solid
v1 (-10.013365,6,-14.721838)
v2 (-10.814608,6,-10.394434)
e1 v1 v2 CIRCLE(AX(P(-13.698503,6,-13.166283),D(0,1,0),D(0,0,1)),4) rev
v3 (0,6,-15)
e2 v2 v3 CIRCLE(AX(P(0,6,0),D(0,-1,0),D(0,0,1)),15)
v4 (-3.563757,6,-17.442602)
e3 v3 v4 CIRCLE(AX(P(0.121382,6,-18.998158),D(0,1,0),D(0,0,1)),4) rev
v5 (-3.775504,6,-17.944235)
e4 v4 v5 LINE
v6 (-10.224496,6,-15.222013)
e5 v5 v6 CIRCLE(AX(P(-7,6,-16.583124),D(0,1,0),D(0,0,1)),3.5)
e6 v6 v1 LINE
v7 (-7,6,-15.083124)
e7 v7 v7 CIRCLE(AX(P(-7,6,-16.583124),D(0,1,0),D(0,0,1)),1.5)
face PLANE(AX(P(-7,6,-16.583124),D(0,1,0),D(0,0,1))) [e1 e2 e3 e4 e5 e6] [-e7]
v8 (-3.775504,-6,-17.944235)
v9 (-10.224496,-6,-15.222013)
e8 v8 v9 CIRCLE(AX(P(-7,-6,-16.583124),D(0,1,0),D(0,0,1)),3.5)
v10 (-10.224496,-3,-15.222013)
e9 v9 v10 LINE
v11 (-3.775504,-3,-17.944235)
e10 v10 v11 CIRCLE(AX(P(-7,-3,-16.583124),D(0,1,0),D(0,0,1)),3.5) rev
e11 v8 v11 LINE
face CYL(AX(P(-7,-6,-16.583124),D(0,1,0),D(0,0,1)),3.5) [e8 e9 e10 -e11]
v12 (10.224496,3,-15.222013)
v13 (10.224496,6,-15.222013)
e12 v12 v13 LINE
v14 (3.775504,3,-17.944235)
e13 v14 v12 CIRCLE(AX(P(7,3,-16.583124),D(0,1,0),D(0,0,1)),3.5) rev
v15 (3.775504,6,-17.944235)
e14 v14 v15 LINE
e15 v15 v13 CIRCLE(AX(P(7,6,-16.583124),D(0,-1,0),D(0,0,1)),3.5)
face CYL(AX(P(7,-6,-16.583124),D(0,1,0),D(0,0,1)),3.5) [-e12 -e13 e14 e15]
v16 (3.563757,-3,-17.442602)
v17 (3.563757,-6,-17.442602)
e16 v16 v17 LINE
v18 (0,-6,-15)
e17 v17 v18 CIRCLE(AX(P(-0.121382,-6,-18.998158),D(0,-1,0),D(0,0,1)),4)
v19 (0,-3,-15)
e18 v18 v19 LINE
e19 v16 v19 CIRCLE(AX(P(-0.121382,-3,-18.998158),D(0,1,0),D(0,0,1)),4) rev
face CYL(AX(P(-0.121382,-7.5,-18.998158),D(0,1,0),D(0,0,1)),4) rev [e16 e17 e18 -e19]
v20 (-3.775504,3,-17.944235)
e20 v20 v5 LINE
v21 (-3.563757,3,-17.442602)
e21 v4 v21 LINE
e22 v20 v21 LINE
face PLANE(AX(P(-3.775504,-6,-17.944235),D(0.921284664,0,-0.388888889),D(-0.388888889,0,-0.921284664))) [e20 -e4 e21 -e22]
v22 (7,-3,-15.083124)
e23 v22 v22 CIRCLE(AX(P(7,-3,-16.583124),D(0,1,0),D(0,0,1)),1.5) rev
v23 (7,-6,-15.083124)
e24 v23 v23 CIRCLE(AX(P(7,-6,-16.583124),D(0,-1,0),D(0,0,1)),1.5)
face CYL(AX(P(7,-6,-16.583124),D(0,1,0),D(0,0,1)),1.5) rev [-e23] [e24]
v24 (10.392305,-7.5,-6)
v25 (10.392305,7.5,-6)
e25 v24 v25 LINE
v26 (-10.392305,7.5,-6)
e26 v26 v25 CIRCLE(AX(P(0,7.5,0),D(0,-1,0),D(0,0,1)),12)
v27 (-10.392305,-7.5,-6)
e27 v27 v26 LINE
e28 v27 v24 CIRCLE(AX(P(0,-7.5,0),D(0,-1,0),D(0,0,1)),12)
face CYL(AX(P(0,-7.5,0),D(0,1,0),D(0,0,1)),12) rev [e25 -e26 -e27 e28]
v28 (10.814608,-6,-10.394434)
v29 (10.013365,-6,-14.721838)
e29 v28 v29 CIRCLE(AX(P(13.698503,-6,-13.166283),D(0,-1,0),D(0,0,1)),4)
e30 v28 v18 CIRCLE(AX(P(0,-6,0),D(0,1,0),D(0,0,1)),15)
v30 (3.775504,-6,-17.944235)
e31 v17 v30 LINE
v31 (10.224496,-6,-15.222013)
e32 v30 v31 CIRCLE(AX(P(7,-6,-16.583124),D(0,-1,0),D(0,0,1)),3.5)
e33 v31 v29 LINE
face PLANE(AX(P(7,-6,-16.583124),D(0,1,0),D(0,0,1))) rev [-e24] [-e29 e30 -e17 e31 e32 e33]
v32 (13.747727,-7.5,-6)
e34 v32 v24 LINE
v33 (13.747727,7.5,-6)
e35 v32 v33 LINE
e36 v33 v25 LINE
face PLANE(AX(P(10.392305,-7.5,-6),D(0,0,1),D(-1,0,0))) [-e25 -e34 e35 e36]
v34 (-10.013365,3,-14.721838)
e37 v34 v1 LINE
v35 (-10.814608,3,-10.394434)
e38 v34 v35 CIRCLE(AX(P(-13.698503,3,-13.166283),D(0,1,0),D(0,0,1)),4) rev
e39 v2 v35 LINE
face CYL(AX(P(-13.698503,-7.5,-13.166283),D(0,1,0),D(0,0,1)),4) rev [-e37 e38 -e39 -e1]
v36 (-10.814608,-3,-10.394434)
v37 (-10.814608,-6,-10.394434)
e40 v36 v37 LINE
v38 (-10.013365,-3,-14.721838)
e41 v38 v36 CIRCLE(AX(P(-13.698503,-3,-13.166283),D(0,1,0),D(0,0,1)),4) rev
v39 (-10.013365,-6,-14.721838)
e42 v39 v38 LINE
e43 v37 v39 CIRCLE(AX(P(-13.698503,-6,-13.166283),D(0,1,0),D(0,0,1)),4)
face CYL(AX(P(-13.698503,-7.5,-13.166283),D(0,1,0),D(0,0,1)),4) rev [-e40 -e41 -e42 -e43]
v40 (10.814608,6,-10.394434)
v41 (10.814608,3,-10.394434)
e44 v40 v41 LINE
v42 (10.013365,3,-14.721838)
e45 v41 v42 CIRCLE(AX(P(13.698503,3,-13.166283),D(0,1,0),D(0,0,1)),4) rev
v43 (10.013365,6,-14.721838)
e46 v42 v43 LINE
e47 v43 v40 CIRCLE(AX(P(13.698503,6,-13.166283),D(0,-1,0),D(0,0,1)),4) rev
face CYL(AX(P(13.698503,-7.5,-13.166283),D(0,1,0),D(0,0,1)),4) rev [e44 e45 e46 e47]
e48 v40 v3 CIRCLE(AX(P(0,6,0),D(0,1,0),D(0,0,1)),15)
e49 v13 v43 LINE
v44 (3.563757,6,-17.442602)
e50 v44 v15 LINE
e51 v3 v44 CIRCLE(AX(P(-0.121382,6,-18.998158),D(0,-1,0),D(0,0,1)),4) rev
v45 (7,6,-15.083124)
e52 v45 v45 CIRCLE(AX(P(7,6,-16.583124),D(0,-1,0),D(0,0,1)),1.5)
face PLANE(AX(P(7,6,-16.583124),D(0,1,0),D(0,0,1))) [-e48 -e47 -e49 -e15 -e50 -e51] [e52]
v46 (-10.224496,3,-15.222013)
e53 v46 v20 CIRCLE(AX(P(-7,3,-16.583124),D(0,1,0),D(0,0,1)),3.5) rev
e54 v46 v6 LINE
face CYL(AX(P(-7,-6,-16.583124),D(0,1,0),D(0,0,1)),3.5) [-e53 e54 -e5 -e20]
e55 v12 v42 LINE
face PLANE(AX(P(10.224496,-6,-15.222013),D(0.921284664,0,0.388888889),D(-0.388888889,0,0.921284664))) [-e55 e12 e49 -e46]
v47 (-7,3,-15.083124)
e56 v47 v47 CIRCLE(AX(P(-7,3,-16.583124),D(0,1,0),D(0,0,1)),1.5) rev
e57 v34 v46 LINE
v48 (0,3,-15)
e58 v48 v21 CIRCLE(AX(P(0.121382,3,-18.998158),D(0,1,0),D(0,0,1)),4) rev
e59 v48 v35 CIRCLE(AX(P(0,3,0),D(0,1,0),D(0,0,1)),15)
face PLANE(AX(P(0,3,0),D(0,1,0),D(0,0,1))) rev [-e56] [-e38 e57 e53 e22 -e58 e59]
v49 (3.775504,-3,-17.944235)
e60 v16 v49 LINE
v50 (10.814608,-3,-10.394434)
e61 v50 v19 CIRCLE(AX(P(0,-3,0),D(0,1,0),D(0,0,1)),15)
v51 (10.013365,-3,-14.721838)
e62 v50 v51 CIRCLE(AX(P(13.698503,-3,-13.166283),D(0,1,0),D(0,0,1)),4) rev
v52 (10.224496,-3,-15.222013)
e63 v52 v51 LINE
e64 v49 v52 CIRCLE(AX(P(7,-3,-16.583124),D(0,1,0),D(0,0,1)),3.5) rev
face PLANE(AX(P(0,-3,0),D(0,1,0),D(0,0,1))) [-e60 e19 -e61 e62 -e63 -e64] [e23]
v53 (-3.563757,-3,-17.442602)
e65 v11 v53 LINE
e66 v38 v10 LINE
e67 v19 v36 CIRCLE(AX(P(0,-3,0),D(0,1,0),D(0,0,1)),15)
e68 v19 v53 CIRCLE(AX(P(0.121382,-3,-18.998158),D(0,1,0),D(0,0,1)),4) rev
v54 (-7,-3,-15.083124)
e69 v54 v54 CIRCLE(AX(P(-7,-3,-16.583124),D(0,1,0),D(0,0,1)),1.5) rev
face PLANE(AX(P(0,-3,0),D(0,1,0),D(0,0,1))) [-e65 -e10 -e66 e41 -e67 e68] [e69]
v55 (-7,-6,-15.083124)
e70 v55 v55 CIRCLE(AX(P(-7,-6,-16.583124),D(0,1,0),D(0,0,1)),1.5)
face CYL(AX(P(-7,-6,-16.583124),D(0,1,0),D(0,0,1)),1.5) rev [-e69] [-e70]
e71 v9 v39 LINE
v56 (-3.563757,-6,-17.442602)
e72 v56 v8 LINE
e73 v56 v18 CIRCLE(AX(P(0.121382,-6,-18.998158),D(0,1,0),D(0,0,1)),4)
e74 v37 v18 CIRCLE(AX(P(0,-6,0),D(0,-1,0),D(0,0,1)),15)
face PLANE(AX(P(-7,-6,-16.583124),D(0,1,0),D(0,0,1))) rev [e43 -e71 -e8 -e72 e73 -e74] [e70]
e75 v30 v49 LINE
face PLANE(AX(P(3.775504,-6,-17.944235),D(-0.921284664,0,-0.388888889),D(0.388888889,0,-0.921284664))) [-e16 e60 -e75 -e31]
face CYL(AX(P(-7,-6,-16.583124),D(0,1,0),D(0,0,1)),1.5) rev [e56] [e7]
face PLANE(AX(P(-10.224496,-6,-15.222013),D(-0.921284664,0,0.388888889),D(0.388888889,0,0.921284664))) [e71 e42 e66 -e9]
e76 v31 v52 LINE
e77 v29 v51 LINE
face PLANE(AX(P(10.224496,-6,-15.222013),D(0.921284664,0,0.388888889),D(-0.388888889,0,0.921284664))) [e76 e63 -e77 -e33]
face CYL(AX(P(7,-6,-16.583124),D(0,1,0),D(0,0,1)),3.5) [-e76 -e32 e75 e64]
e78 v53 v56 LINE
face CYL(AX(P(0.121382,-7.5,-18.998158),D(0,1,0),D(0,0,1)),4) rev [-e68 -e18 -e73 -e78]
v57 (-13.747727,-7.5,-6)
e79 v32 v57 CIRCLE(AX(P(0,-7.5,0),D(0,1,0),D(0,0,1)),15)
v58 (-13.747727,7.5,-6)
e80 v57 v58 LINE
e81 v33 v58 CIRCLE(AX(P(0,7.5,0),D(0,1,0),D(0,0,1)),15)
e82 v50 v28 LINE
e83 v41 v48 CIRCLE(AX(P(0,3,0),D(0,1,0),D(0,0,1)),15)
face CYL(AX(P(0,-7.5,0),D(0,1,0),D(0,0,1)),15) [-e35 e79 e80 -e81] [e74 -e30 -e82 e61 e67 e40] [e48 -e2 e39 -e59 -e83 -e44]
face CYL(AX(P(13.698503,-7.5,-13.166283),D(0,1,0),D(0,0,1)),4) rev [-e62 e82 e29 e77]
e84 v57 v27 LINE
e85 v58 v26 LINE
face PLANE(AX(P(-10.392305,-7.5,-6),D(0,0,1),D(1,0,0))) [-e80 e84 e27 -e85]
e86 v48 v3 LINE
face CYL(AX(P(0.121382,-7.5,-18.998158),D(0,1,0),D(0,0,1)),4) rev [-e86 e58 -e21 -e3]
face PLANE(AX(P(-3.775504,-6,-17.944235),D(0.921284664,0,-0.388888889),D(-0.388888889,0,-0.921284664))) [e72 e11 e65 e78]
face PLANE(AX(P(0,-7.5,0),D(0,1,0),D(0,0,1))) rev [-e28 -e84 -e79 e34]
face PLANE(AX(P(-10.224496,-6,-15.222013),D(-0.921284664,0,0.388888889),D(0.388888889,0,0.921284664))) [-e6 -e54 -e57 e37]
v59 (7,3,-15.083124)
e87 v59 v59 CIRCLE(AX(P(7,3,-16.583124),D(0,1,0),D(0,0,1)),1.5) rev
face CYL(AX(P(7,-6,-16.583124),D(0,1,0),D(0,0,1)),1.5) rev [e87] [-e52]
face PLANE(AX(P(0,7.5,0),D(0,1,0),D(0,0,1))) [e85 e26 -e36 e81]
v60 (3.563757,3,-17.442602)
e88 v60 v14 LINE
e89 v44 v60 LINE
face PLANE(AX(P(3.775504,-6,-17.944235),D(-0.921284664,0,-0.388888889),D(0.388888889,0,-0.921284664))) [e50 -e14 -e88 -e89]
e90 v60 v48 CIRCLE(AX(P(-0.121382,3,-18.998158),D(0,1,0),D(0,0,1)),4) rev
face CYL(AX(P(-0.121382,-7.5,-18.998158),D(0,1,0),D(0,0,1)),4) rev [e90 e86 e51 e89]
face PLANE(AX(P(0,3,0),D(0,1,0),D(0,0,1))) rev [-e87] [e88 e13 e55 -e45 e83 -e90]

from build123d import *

# Parameters (mm, degrees)
BOSS_EXTRU_1_DEPTH           = 7.5
ESQUISSE2_R                  = 1.5
BOSS_EXTRU_2_DEPTH           = 6
CONG_2_R                     = 4
CONG_2_OF_SYM_TRIE1_R        = 4
ENL_V_MAT_EXTRU_1_DEPTH      = 3
ENL_V_MAT_EXTRU_1_DEPTH_BACK = 3
ESQUISSE3_R                  = 23.003278447
ESQUISSE3_R_2                = 15


with BuildPart() as part:
    # Esquisse1 → Boss.-Extru.1 (new, symmetric)
    with BuildSketch(Plane(origin=(0, 0, 0), x_dir=(1, 0, 0), z_dir=(0, 1, 0))):
        with BuildLine():
            Line((0, 15), (0, 12))
            ThreePointArc((0, 12), (-6, 10.392304845), (-10.392304845, 6))
            Line((-10.392304845, 6), (-13.747727085, 6))
            ThreePointArc((-13.747727085, 6), (-8.215838363, 12.549900398), (0, 15))
        make_face()
    boss_extru_1 = extrude(amount=BOSS_EXTRU_1_DEPTH, both=True)

    # Esquisse2 → Boss.-Extru.2 (add, symmetric)
    with BuildSketch(Plane(origin=(0, 0, 0), x_dir=(1, 0, 0), z_dir=(0, 1, 0))):
        with BuildLine():
            Line((-10.224496324, 15.222012841), (-8.896811047, 12.07670291))
            ThreePointArc((-8.896811047, 12.07670291), (-5.833333333, 13.81926996), (-2.447818399, 14.798925133))
            Line((-2.447818399, 14.798925133), (-3.775503676, 17.944235063))
            ThreePointArc((-3.775503676, 17.944235063), (-8.361111111, 19.807620276), (-10.224496324, 15.222012841))
        make_face()
        with Locations(Location((-7, 16.583123952, 0), (0, 0, 270))):
            Circle(ESQUISSE2_R, mode=Mode.SUBTRACT)
    boss_extru_2 = extrude(amount=BOSS_EXTRU_2_DEPTH, both=True)

    # Congé2
    # the kernel refuses this fillet: 4 mm, written as the material it adds along each edge
    with BuildSketch(Plane(origin=(-2.447818399, -6, -14.798925133), x_dir=(0.9966431178830178, 0, -0.0818687704586858), z_dir=(0, 1, 0))) as cong_2_piece_1:
        with BuildLine():
            CenterArc((2.904362046, 3.974799123), CONG_2_R, 198.189389649, 65.375681648)
            Line((-0.895757454, 2.726163155), (-0.971759844, 2.701190435))
            Line((-0.971759844, 2.701190435), (-0.07600239, -0.024972719))
            Line((-0.07600239, -0.024972719), (0.006549502, -0.079731449))
            ThreePointArc((0.006549502, -0.079731449), (1.228031557, -0.029646768), (2.447097135, -0.079495982))
            Line((2.447097135, -0.079495982), (2.456063114, 0))
        make_face()
    extrude(amount=12)
    with BuildSketch(Plane(origin=(-8.896811047, -6, -12.07670291), x_dir=(-0.7517608452817168, 0, 0.6594358433549989), z_dir=(0, 1, 0))) as cong_2_piece_2:
        with BuildLine():
            CenterArc((2.891216238, -3.985511596), CONG_2_R, 94.878081885, 66.750437409)
            Line((-0.904915803, -2.724804838), (-0.980838444, -2.699590703))
            Line((-0.980838444, -2.699590703), (-0.075922641, 0.025214135))
            Line((-0.075922641, 0.025214135), (0.006802862, 0.079710232))
            ThreePointArc((0.006802862, 0.079710232), (1.275536575, 0.025668484), (2.544270289, 0.079710232))
            Line((2.544270289, 0.079710232), (2.551073151, 0))
        make_face()
    extrude(amount=12)

    # Symétrie1: Boss.-Extru.1, Boss.-Extru.2 across plane
    add(boss_extru_1.mirror(Plane(origin=(0, -7.5, -15), x_dir=(0, 0, 1), z_dir=(1, 0, 0))))
    add(boss_extru_2.mirror(Plane(origin=(0, -7.5, -15), x_dir=(0, 0, 1), z_dir=(1, 0, 0))))

    # Congé2 of Symétrie1
    # the kernel refuses this fillet: 4 mm, written as the material it adds along each edge
    with BuildSketch(Plane(origin=(2.447818399, -6, -14.798925133), x_dir=(-0.9966431178830035, 0, -0.08186877045886062), z_dir=(0, 1, 0))) as cong_2_of_sym_trie1_piece_1:
        with BuildLine():
            CenterArc((2.904362046, -3.974799123), CONG_2_OF_SYM_TRIE1_R, 96.434928703, 65.375681648)
            Line((-0.895757454, -2.726163155), (-0.971759844, -2.701190435))
            Line((-0.971759844, -2.701190435), (-0.07600239, 0.024972719))
            Line((-0.07600239, 0.024972719), (0.006549502, 0.079731449))
            ThreePointArc((0.006549502, 0.079731449), (1.228031557, 0.029646768), (2.447097135, 0.079495982))
            Line((2.447097135, 0.079495982), (2.456063114, 0))
        make_face()
    extrude(amount=12)
    with BuildSketch(Plane(origin=(8.896811047, -6, -12.07670291), x_dir=(0.7517608452817176, 0, 0.6594358433549979), z_dir=(0, 1, 0))) as cong_2_of_sym_trie1_piece_2:
        with BuildLine():
            CenterArc((2.891216238, 3.985511596), CONG_2_OF_SYM_TRIE1_R, 198.371480706, 66.750437409)
            Line((-0.904915803, 2.724804838), (-0.980838444, 2.699590703))
            Line((-0.980838444, 2.699590703), (-0.075922641, -0.025214135))
            Line((-0.075922641, -0.025214135), (0.006802862, -0.079710232))
            ThreePointArc((0.006802862, -0.079710232), (1.275536575, -0.025668484), (2.544270289, -0.079710232))
            Line((2.544270289, -0.079710232), (2.551073151, 0))
        make_face()
    extrude(amount=12)

    # Esquisse3 → Enlèv. mat.-Extru.1 (cut, two sides: drawn at the far end of the back side and taken through both)
    with BuildSketch(Plane(origin=(0, 0, 0), x_dir=(1, 0, 0), z_dir=(0, 1, 0)).offset(-ENL_V_MAT_EXTRU_1_DEPTH_BACK)):
        Circle(ESQUISSE3_R)
        Circle(ESQUISSE3_R_2, mode=Mode.SUBTRACT)
    extrude(amount=ENL_V_MAT_EXTRU_1_DEPTH + ENL_V_MAT_EXTRU_1_DEPTH_BACK, mode=Mode.SUBTRACT)


solid = part.part
